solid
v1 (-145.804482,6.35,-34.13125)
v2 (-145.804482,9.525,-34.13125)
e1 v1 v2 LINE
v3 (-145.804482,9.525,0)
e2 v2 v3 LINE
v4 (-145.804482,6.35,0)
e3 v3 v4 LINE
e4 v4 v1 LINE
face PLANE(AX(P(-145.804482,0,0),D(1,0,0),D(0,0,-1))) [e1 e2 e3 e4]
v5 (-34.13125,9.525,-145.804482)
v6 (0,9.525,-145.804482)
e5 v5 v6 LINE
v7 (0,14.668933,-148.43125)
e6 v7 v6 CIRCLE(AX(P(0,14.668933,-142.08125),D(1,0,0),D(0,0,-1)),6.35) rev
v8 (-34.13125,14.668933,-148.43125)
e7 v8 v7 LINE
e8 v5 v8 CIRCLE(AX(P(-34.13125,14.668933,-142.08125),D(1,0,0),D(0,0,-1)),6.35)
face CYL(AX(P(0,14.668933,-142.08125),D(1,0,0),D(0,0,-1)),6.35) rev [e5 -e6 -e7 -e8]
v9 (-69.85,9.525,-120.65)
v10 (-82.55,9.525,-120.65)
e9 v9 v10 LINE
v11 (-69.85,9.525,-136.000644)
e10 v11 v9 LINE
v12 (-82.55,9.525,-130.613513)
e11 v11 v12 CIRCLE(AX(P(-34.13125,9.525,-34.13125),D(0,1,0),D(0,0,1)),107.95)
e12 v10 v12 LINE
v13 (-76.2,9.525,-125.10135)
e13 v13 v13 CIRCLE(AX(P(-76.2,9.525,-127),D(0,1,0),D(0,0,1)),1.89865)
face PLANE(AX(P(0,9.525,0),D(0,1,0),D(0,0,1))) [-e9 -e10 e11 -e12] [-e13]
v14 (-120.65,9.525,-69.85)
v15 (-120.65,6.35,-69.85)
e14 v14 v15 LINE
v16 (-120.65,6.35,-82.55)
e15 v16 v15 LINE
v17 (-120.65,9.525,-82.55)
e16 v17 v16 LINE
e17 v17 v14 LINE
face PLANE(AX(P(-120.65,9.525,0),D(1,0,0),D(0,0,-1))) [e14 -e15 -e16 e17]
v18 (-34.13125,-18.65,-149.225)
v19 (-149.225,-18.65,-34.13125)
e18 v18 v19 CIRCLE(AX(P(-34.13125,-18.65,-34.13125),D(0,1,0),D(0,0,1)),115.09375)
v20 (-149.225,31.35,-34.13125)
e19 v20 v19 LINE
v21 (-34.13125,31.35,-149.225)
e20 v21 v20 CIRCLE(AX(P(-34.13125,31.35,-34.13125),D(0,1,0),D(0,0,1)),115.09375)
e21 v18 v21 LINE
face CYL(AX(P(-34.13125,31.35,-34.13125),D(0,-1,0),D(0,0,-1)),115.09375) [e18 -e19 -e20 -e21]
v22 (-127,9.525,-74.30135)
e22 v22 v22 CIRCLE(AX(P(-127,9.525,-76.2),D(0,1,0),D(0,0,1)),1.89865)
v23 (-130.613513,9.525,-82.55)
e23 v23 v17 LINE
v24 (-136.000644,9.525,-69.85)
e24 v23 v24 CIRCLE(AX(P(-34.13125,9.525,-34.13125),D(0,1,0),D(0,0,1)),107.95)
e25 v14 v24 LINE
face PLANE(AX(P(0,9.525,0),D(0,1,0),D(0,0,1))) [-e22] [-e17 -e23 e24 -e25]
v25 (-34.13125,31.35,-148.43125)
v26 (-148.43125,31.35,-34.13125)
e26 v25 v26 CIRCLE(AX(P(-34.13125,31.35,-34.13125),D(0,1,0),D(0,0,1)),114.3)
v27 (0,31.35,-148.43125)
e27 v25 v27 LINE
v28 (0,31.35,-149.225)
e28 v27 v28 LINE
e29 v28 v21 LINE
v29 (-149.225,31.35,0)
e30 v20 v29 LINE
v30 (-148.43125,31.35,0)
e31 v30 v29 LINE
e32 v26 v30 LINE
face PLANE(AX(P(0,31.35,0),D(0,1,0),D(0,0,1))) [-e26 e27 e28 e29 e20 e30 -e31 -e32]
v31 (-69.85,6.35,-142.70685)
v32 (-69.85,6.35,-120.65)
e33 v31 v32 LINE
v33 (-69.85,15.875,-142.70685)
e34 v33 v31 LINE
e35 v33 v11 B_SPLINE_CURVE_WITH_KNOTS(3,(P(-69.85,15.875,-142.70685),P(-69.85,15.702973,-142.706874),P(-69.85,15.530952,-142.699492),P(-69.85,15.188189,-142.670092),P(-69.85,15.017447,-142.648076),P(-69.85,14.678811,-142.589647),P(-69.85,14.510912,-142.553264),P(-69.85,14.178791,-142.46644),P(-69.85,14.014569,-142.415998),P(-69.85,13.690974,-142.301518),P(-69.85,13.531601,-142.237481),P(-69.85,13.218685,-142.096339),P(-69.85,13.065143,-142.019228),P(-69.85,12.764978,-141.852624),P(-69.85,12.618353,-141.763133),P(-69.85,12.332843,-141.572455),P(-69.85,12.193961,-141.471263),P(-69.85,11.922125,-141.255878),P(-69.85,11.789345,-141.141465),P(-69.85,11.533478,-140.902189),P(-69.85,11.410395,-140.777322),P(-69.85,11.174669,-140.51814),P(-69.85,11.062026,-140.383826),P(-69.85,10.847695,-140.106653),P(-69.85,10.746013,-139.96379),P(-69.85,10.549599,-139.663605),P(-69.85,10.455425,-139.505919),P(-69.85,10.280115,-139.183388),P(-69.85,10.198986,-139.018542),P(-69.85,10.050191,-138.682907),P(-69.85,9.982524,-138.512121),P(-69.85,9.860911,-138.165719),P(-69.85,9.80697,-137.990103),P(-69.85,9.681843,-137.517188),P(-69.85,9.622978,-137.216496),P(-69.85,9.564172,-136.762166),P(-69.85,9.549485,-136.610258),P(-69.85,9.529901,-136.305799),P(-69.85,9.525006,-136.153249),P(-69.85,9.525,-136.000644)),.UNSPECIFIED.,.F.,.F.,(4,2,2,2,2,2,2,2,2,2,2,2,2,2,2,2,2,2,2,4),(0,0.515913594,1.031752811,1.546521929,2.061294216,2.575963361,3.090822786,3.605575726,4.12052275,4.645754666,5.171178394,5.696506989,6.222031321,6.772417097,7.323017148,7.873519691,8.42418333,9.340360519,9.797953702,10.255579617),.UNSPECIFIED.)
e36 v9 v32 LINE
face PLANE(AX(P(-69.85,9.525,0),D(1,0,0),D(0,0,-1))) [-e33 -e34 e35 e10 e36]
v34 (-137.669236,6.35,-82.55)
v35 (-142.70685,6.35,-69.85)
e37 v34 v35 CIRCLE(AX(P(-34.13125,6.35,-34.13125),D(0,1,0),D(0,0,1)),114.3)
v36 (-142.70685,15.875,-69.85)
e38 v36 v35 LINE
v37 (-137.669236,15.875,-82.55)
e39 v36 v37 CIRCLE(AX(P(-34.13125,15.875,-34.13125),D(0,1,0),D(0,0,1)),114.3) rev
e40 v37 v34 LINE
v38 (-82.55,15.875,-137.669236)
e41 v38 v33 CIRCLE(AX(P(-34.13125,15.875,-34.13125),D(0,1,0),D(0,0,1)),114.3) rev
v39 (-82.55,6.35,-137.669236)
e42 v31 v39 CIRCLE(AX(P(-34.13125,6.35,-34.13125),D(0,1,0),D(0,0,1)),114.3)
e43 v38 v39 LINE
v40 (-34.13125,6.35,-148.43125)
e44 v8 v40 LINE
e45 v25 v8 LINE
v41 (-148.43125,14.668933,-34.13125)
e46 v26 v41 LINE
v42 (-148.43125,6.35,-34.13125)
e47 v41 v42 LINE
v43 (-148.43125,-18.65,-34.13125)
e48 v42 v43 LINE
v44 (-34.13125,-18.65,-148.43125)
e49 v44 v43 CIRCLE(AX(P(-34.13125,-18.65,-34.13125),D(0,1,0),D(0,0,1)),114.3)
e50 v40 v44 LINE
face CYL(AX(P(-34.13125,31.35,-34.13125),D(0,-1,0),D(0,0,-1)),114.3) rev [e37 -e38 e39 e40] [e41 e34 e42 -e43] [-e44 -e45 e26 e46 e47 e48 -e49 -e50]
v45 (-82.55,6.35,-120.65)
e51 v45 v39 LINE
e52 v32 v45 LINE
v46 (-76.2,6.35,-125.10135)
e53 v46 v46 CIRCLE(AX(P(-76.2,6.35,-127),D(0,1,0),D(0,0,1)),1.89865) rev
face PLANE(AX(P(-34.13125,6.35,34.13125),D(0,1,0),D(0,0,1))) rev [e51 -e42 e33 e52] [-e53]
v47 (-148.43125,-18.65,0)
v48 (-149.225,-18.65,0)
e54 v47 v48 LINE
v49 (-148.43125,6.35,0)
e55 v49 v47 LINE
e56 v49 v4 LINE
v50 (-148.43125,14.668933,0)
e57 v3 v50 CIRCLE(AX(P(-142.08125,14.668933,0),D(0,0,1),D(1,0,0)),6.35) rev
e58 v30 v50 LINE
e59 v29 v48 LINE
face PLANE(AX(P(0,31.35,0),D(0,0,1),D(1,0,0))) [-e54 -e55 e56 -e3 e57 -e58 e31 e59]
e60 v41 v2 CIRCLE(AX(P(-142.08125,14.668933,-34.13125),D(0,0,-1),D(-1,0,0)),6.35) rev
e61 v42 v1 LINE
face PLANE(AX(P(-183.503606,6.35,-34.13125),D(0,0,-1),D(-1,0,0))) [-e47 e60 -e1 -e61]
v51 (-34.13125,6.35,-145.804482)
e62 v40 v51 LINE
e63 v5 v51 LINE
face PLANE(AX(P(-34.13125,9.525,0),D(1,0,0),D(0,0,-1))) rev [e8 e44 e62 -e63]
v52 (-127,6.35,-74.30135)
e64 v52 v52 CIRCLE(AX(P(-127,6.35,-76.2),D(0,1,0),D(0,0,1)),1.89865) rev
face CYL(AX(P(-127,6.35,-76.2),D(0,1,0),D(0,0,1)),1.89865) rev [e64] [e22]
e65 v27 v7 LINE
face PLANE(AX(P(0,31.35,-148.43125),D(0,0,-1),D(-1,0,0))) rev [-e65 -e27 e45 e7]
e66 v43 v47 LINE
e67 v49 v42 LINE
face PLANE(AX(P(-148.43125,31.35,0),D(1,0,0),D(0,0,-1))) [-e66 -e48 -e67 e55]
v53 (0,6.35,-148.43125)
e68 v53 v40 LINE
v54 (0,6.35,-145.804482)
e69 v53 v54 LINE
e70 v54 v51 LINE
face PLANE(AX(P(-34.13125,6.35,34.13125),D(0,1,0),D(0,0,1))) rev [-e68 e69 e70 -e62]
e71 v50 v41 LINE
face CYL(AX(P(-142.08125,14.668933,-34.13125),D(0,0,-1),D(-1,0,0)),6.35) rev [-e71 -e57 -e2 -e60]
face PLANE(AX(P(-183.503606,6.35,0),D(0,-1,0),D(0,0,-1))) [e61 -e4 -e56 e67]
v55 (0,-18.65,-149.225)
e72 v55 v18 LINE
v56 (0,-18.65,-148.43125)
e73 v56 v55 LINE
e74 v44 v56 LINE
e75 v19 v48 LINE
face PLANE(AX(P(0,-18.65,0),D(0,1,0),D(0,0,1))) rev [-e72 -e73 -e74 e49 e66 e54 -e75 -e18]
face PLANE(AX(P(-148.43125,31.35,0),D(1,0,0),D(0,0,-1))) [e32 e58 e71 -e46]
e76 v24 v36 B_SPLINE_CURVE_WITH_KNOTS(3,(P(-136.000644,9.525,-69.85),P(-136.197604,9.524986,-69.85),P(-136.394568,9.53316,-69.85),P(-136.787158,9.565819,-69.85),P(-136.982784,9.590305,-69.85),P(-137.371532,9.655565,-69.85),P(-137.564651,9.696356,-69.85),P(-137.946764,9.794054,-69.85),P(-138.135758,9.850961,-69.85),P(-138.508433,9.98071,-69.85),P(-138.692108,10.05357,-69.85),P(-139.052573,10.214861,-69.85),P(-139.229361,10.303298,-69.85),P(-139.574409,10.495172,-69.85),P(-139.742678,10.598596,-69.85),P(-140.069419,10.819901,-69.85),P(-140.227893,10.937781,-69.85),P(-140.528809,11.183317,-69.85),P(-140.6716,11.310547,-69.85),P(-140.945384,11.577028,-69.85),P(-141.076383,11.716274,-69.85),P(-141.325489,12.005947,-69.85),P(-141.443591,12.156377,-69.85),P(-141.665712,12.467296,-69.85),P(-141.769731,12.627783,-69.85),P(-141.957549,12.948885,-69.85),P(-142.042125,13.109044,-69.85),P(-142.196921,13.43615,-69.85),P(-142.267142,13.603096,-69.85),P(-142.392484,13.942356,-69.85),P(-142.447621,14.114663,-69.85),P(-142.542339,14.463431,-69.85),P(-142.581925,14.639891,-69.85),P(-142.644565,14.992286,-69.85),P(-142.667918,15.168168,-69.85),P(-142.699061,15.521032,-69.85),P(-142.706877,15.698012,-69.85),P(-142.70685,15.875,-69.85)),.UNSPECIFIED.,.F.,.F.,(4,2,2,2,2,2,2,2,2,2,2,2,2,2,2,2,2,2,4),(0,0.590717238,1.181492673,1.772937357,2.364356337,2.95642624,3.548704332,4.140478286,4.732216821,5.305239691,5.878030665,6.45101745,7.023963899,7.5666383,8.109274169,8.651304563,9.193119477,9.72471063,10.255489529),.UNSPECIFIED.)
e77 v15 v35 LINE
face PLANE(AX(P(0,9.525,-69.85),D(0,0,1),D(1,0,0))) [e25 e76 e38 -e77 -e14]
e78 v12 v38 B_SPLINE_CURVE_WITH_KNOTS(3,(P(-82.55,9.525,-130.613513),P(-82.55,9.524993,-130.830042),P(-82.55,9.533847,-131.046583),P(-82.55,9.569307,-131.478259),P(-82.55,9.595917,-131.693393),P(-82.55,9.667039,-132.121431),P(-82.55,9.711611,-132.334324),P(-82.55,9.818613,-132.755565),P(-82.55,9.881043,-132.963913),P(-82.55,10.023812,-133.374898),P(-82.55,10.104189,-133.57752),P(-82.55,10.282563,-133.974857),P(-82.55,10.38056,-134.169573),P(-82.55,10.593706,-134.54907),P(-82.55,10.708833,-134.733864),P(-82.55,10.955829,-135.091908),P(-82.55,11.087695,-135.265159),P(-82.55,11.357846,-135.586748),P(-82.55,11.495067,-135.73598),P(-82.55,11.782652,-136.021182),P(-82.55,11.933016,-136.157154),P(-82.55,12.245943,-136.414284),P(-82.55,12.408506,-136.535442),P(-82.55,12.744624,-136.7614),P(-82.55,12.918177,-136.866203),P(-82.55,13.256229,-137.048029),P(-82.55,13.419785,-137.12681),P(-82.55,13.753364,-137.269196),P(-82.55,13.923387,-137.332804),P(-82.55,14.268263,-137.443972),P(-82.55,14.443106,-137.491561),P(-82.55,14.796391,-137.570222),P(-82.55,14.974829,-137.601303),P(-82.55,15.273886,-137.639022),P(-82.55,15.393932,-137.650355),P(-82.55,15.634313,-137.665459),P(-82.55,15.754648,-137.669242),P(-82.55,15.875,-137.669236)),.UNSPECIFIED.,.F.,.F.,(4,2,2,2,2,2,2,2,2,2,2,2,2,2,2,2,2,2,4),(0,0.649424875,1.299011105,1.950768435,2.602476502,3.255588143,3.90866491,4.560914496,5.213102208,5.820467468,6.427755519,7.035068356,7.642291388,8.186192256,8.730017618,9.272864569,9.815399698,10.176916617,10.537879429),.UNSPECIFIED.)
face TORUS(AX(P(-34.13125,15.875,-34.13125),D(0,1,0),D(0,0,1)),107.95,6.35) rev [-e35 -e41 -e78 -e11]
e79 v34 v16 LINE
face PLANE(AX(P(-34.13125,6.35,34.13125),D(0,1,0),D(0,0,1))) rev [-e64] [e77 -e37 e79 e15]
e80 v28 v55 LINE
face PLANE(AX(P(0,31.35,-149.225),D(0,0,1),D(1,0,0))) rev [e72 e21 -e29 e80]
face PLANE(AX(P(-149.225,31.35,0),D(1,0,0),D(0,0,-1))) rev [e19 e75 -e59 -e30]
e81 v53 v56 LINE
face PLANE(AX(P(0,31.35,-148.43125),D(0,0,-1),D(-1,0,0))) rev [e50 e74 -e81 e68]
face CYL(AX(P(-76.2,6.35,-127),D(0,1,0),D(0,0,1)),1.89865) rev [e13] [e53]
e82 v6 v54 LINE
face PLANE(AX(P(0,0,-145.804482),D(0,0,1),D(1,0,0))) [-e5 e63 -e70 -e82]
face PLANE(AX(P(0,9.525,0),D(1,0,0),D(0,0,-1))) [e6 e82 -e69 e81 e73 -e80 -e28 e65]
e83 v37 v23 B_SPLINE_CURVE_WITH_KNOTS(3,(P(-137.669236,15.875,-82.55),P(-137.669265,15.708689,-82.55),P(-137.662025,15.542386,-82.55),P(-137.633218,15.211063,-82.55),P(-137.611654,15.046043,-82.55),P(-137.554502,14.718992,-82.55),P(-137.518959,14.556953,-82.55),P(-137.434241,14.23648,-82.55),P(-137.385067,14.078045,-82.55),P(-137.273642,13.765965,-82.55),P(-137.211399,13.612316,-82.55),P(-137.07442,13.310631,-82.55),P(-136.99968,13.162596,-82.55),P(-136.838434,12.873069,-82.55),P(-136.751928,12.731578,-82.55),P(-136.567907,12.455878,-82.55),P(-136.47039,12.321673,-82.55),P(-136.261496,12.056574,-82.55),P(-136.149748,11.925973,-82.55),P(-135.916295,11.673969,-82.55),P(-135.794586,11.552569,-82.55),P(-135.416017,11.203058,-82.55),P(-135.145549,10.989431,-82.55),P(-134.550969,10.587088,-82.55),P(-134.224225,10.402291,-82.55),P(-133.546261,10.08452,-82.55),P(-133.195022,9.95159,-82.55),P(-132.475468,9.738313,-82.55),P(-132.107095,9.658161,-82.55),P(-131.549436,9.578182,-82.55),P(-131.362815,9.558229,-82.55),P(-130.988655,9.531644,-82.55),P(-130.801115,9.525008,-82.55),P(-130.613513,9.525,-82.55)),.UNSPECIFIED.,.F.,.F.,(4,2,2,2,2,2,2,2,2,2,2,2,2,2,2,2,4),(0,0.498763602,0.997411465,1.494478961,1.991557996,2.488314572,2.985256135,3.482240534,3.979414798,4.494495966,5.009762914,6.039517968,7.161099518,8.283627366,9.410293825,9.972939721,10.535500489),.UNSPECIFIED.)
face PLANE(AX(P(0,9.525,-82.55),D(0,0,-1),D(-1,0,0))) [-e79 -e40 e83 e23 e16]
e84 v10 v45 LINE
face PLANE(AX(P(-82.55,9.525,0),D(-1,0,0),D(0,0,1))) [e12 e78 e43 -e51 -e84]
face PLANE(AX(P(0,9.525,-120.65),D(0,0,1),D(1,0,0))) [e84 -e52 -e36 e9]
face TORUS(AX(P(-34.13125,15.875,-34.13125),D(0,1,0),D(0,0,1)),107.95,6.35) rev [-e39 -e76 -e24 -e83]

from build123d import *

# Parameters (mm, degrees)
BOSS_EXTRUDE1_DEPTH      = 6.35
CUT_EXTRUDE1_DEPTH       = 6.35
M4_CLEARANCE_HOLE1_D     = 4.5
F_6_CLEARANCE_HOLE1_D    = 3.7973
F_6_CLEARANCE_HOLE2_D    = 3.7973
SKETCH29_R               = 1.898650000000008
BOSS_EXTRUDE4_DEPTH      = 3.175
CUT_EXTRUDE9_DEPTH       = 211.00951038732748
BOSS_EXTRUDE5_DEPTH      = 25
BOSS_EXTRUDE5_DEPTH_BACK = 25
BOSS_EXTRUDE6_DEPTH      = 3.420518063
SKETCH32_W               = 34.13124999999999
SKETCH32_H               = 3.175
BOSS_EXTRUDE7_DEPTH      = 3.420518063
FILLET2_R                = 6.35
FILLET3_R                = 6.35


with BuildPart() as part:
    # Sketch1 → Boss-Extrude1 (new body)
    with BuildSketch(Plane(origin=(0, 0, 0), x_dir=(1, 0, 0), z_dir=(0, 1, 0))):
        with BuildLine():
            Line((-34.13124999999996, -148.43124999999998), (34.131250000000016, -148.43124999999998))
            ThreePointArc((34.131250000000016, -148.43124999999998), (114.9535550896224, -114.95355508962234), (148.43124999999998, -34.13124999999996))
            Line((148.43124999999998, -34.13124999999996), (148.43124999999998, 34.131250000000016))
            ThreePointArc((148.43124999999998, 34.131250000000016), (114.9535550896224, 114.9535550896224), (34.131250000000016, 148.43125000000003))
            Line((34.131250000000016, 148.43125000000003), (-34.13124999999996, 148.43125000000003))
            ThreePointArc((-34.13124999999996, 148.43125000000003), (-114.95355508962231, 114.95355508962237), (-148.43124999999992, 34.131250000000016))
            Line((-148.43124999999992, 34.131250000000016), (-148.43124999999992, -34.13124999999996))
            ThreePointArc((-148.43124999999992, -34.13124999999996), (-114.95355508962234, -114.95355508962234), (-34.13124999999996, -148.43124999999998))
        make_face()
    extrude(amount=BOSS_EXTRUDE1_DEPTH)

    # Sketch4 → Cut-Extrude1 (cut)
    # profile 1 of 4: a face of its own
    with BuildSketch(Plane(origin=(0, 6.35, 0), x_dir=(1, 0, 0), z_dir=(0, 1, 0))):
        with BuildLine():
            ThreePointArc((-39.4480000000008, 145.80448193711538), (-49.893930566331434, 144.3300216659586), (-59.52363351317686, 140.0218527227403))
            ThreePointArc((-59.52363351317686, 140.0218527227403), (-63.81750000000949, 132.2535819370977), (-59.52363351317676, 124.48531115145514))
            ThreePointArc((-59.52363351317676, 124.48531115145514), (-49.89393056632884, 120.17714220824536), (-39.448000000000604, 118.70268193708908))
            Line((-39.448000000000604, 118.70268193708908), (39.44799999999939, 118.70268193708088))
            ThreePointArc((39.44799999999939, 118.70268193708088), (49.89393056633003, 120.17714220823765), (59.52363351317546, 124.48531115145597))
            ThreePointArc((59.52363351317546, 124.48531115145597), (63.817500000008096, 132.25358193709857), (59.523633513170694, 140.0218527227337))
            ThreePointArc((59.523633513170694, 140.0218527227337), (49.893930566325004, 144.3300216659425), (39.4479999999992, 145.80448193710717))
            Line((39.4479999999992, 145.80448193710717), (-39.4480000000008, 145.80448193711538))
        make_face()
        with BuildLine():
            ThreePointArc((39.447999999999375, 120.29018193708089), (49.454528647108134, 121.70261990502122), (58.67916380898574, 125.82956825808905))
            ThreePointArc((58.67916380898574, 125.82956825808905), (62.229999999999336, 132.25358193709857), (58.67916380898565, 138.67759561610805))
            ThreePointArc((58.67916380898565, 138.67759561610805), (49.45452864710313, 142.80454396915894), (39.447999999999205, 144.21698193711595))
            Line((39.447999999999205, 144.21698193711595), (-39.44800000000079, 144.21698193711538))
            ThreePointArc((-39.44800000000079, 144.21698193711538), (-49.454528647109534, 142.80454396917506), (-58.67916380898715, 138.67759561610723))
            ThreePointArc((-58.67916380898715, 138.67759561610723), (-62.23000000000073, 132.25358193709772), (-58.67916380898706, 125.82956825808822))
            ThreePointArc((-58.67916380898706, 125.82956825808822), (-49.454528647104546, 121.70261990503734), (-39.44800000000062, 120.29018193708033))
            Line((-39.44800000000062, 120.29018193708033), (39.447999999999375, 120.29018193708089))
        make_face(mode=Mode.SUBTRACT)
    # profile 2 of 4: a face of its own
    with BuildSketch(Plane(origin=(0, 6.35, 0), x_dir=(1, 0, 0), z_dir=(0, 1, 0))):
        with BuildLine():
            Line((-39.44800000000062, 120.29018193708033), (39.447999999999375, 120.29018193708089))
            ThreePointArc((39.447999999999375, 120.29018193708089), (49.454528647108134, 121.70261990502122), (58.67916380898574, 125.82956825808905))
            ThreePointArc((58.67916380898574, 125.82956825808905), (62.229999999999336, 132.25358193709857), (58.67916380898565, 138.67759561610805))
            ThreePointArc((58.67916380898565, 138.67759561610805), (49.45452864710313, 142.80454396915894), (39.447999999999205, 144.21698193711595))
            Line((39.447999999999205, 144.21698193711595), (-39.44800000000079, 144.21698193711538))
            ThreePointArc((-39.44800000000079, 144.21698193711538), (-49.454528647109534, 142.80454396917506), (-58.67916380898715, 138.67759561610723))
            ThreePointArc((-58.67916380898715, 138.67759561610723), (-62.23000000000073, 132.25358193709772), (-58.67916380898706, 125.82956825808822))
            ThreePointArc((-58.67916380898706, 125.82956825808822), (-49.454528647104546, 121.70261990503734), (-39.44800000000062, 120.29018193708033))
        make_face()
    # profile 3 of 4: a face of its own
    with BuildSketch(Plane(origin=(0, 6.35, 0), x_dir=(1, 0, 0), z_dir=(0, 1, 0))):
        with BuildLine():
            ThreePointArc((-59.5236335131764, -124.48531115145636), (-63.8175000000091, -132.25358193709894), (-59.52363351317174, -140.02185272273414))
            ThreePointArc((-59.52363351317174, -140.02185272273414), (-49.893930566326084, -144.33002166594298), (-39.44800000000029, -145.80448193711646))
            Line((-39.44800000000029, -145.80448193711646), (39.44799999999971, -145.80448193711646))
            ThreePointArc((39.44799999999971, -145.80448193711646), (49.89393056633035, -144.33002166595978), (59.52363351317579, -140.02185272274153))
            ThreePointArc((59.52363351317579, -140.02185272274153), (63.8175000000085, -132.25358193709894), (59.52363351317116, -124.48531115146376))
            ThreePointArc((59.52363351317116, -124.48531115146376), (49.89393056632551, -120.1771422082549), (39.44799999999971, -118.70268193709018))
            Line((39.44799999999971, -118.70268193709018), (-39.44800000000029, -118.70268193708142))
            ThreePointArc((-39.44800000000029, -118.70268193708142), (-49.89393056633094, -120.17714220823811), (-59.5236335131764, -124.48531115145636))
        make_face()
        with BuildLine():
            ThreePointArc((-58.679163808986694, -138.67759561610845), (-49.454528647104205, -142.8045439691594), (-39.44800000000029, -144.21698193711646))
            Line((-39.44800000000029, -144.21698193711646), (39.44799999999971, -144.21698193711646))
            ThreePointArc((39.44799999999971, -144.21698193711646), (49.45452864710846, -142.8045439691762), (58.679163808986104, -138.67759561610845))
            ThreePointArc((58.679163808986104, -138.67759561610845), (62.22999999999976, -132.25358193709894), (58.679163808986104, -125.82956825808944))
            ThreePointArc((58.679163808986104, -125.82956825808944), (49.45452864710362, -121.7026199050385), (39.44799999999971, -120.29018193708143))
            Line((39.44799999999971, -120.29018193708143), (-39.44800000000029, -120.29018193708143))
            ThreePointArc((-39.44800000000029, -120.29018193708143), (-49.45452864710904, -121.70261990502169), (-58.679163808986694, -125.82956825808944))
            ThreePointArc((-58.679163808986694, -125.82956825808944), (-62.230000000000345, -132.25358193709894), (-58.679163808986694, -138.67759561610845))
        make_face(mode=Mode.SUBTRACT)
    # profile 4 of 4: a face of its own
    with BuildSketch(Plane(origin=(0, 6.35, 0), x_dir=(1, 0, 0), z_dir=(0, 1, 0))):
        with BuildLine():
            ThreePointArc((-58.679163808986694, -125.82956825808944), (-62.230000000000345, -132.25358193709894), (-58.679163808986694, -138.67759561610845))
            ThreePointArc((-58.679163808986694, -138.67759561610845), (-49.454528647104205, -142.8045439691594), (-39.44800000000029, -144.21698193711646))
            Line((-39.44800000000029, -144.21698193711646), (39.44799999999971, -144.21698193711646))
            ThreePointArc((39.44799999999971, -144.21698193711646), (49.45452864710846, -142.8045439691762), (58.679163808986104, -138.67759561610845))
            ThreePointArc((58.679163808986104, -138.67759561610845), (62.22999999999976, -132.25358193709894), (58.679163808986104, -125.82956825808944))
            ThreePointArc((58.679163808986104, -125.82956825808944), (49.45452864710362, -121.7026199050385), (39.44799999999971, -120.29018193708143))
            Line((39.44799999999971, -120.29018193708143), (-39.44800000000029, -120.29018193708143))
            ThreePointArc((-39.44800000000029, -120.29018193708143), (-49.45452864710904, -121.70261990502169), (-58.679163808986694, -125.82956825808944))
        make_face()
    extrude(amount=-CUT_EXTRUDE1_DEPTH, mode=Mode.SUBTRACT)

    # M4 Clearance Hole1 (through all)
    with Locations(Plane(origin=(0, 6.35, 0), x_dir=(1, 0, 0), z_dir=(0, 1, 0))):
        with Locations((-16, -103.6875), (16, -103.6875), (22, -60.325), (-10, -60.325), (-10, 60.325), (22, 60.325), (16, 103.6875), (-16, 103.6875)):
            Hole(M4_CLEARANCE_HOLE1_D / 2)

    # #6 Clearance Hole1 (through all)
    with Locations(Plane(origin=(0, 6.35, 0), x_dir=(1, 0, 0), z_dir=(0, 1, 0))):
        with Locations((-101.6, -101.6), (-101.6, 101.6), (101.6, 101.6), (101.6, -101.6), (-127, -76.2), (-127, -50.8), (-127, 50.8), (-127, 76.2), (-101.6, 76.2), (-101.6, 50.8), (-101.6, 25.4), (-101.6, 0), (-101.6, -25.4), (-101.6, -50.8), (-101.6, -76.2), (-76.2, -101.6), (-50.8, -101.6), (-50.8, -76.2), (-76.2, -76.2), (-76.2, -50.8), (-50.8, -50.8), (-50.8, -25.4), (-76.2, -25.4), (-76.2, 0), (-50.8, 0), (-50.8, 25.4), (-76.2, 25.4), (-76.2, 50.8), (-50.8, 50.8), (-50.8, 76.2), (-76.2, 76.2), (-76.2, 101.6), (-50.8, 101.6), (50.8, -101.6), (76.2, -101.6), (101.6, -76.2), (127, -76.2), (127, -50.8), (101.6, -25.4), (101.6, -50.8), (76.2, -25.4), (76.2, -50.8), (76.2, -76.2), (50.8, -76.2), (50.8, -50.8), (50.8, -25.4), (50.8, 0), (76.2, 0), (101.6, 0), (101.6, 25.4), (101.6, 50.8), (101.6, 76.2), (127, 50.8), (127, 76.2), (76.2, 101.6), (50.8, 101.6), (50.8, 76.2), (76.2, 76.2), (76.2, 50.8), (76.2, 25.4), (50.8, 25.4), (50.8, 50.8), (0, 0), (-25.4, -25.4), (-25.4, 0), (-25.4, 25.4), (0, 25.4), (25.4, 25.4), (25.4, 0), (25.4, -25.4), (0, -25.4), (127, -25.4), (127, 0), (127, 25.4), (-127, -25.4), (-127, 0), (-127, 25.4)):
            Hole(F_6_CLEARANCE_HOLE1_D / 2)

    # #6 Clearance Hole2 (through all)
    with Locations(Plane(origin=(0, 6.35, 0), x_dir=(1, 0, 0), z_dir=(0, 1, 0))):
        with Locations((-76.2, -127), (76.2, -127), (76.2, 127), (-76.2, 127)):
            Hole(F_6_CLEARANCE_HOLE2_D / 2)

    # Sketch29 → Boss-Extrude4 (add)
    # profile 1 of 4: a face of its own
    with BuildSketch(Plane(origin=(0, 6.35, 0), x_dir=(1, 0, 0), z_dir=(0, 1, 0))):
        with BuildLine():
            Line((-69.85, 120.64999999999999), (-69.85, 142.70684992207043))
            ThreePointArc((-69.85, 142.70684992207043), (-76.27533753088031, 140.3779717667891), (-82.55, 137.66923649982286))
            Line((-82.55, 137.6692364998229), (-82.54999999999998, 120.64999999999999))
            Line((-82.54999999999998, 120.64999999999999), (-69.85, 120.64999999999999))
        make_face()
        with Locations(Location((-76.19999999999999, 127, 0), (0, 0, 270))):
            Circle(SKETCH29_R, mode=Mode.SUBTRACT)
    # profile 2 of 4: a face of its own
    with BuildSketch(Plane(origin=(0, 6.35, 0), x_dir=(1, 0, 0), z_dir=(0, 1, 0))):
        with BuildLine():
            Line((-120.6500000000006, 82.54999999999993), (-137.6692364998229, 82.54999999999993))
            ThreePointArc((-137.66923649982286, 82.5499999999999), (-140.37797176678907, 76.27533753088025), (-142.70684992207038, 69.84999999999994))
            Line((-142.70684992207043, 69.84999999999994), (-120.6500000000006, 69.84999999999994))
            Line((-120.6500000000006, 69.84999999999994), (-120.6500000000006, 82.54999999999993))
        make_face()
        with Locations(Location((-127.00000000000061, 76.19999999999993, 0), (0, 0, 270))):
            Circle(SKETCH29_R, mode=Mode.SUBTRACT)
    # profile 3 of 4: a face of its own
    with BuildSketch(Plane(origin=(0, 6.35, 0), x_dir=(1, 0, 0), z_dir=(0, 1, 0))):
        Polygon((-145.8044819371153, 34.13124999999998), (-145.8044819371153, 0), (-148.43124999999995, 2.082e-14), (-148.43124999999995, 34.131249999999994), align=None)
    # profile 4 of 4: a face of its own
    with BuildSketch(Plane(origin=(0, 6.35, 0), x_dir=(1, 0, 0), z_dir=(0, 1, 0))):
        Polygon((2.776e-14, 148.43125), (0, 145.80448193711538), (-34.13124999999999, 145.80448193711538), (-34.13124999999996, 148.43125000000003), align=None)
    extrude(amount=BOSS_EXTRUDE4_DEPTH)

    # Sketch30 → Cut-Extrude9 (cut, through all)
    with BuildSketch(Plane(origin=(0, 6.35, 0), x_dir=(1, 0, 0), z_dir=(0, 1, 0))):
        with BuildLine():
            Line((-34.13124999999998, -148.43124999999995), (34.131250000000016, -148.43124999999998))
            ThreePointArc((34.131250000000016, -148.43124999999998), (114.9535550896224, -114.95355508962234), (148.43125, -34.13124999999996))
            Line((148.43125, -34.13124999999996), (148.43124999999998, 34.131250000000016))
            ThreePointArc((148.43124999999998, 34.131250000000016), (114.95355508962237, 114.95355508962237), (34.13125000000002, 148.43125))
            Line((34.13125000000002, 148.43125), (-34.13124999999996, 148.43125000000003))
            ThreePointArc((-34.13124999999996, 148.43125000000003), (-114.95355508962234, 114.9535550896224), (-148.43124999999995, 34.13125000000003))
            Line((-148.43124999999995, 34.13125000000003), (-148.43124999999995, -34.131249999999945))
            ThreePointArc((-148.43124999999995, -34.131249999999945), (-114.95355508962234, -114.95355508962231), (-34.13124999999998, -148.43124999999995))
        make_face()
    extrude(amount=-CUT_EXTRUDE9_DEPTH, mode=Mode.SUBTRACT)


with BuildPart() as cut_extrude9_piece_1:
    # of the separate pieces the step leaves, piece 1, a body of its own (cut_extrude9_pieces)
    add(part.part.solids().sort_by_distance((-82.55, 6.35, -137.6692365))[0])



with BuildPart() as cut_extrude9_piece_2:
    # of the separate pieces the step leaves, piece 2, a body of its own (cut_extrude9_pieces)
    add(part.part.solids().sort_by_distance((-142.706849922, 6.35, -69.85))[0])


with BuildPart() as cut_extrude9_piece_3:
    # of the separate pieces the step leaves, piece 3, a body of its own (cut_extrude9_pieces)
    add(part.part.solids().sort_by_distance((-148.43125, 6.35, -34.13125))[0])


with BuildPart() as cut_extrude9_piece_4:
    # of the separate pieces the step leaves, piece 4, a body of its own (cut_extrude9_pieces)
    add(part.part.solids().sort_by_distance((-34.13125, 6.35, -145.804481937))[0])


with BuildPart() as cut_extrude9_piece_1_1:
    add(cut_extrude9_piece_1.part)

    add(cut_extrude9_piece_2.part)  # Boss-Extrude5 merges Cut-Extrude9 piece 2
    # Sketch29<7> → Boss-Extrude5 (add, two sides: drawn at the far end of the back side and taken through both)
    with BuildSketch(Plane(origin=(0, 6.35, 0), x_dir=(1, 0, 0), z_dir=(0, 1, 0)).offset(-BOSS_EXTRUDE5_DEPTH_BACK)):
        with BuildLine():
            ThreePointArc((-69.85, 142.70684992207043), (-52.21852354947877, 146.99107693388436), (-34.13124999999996, 148.43125000000003))
            Line((-34.13124999999996, 148.43125000000003), (2.842e-14, 148.43125))
            Line((2.776e-14, 148.43125), (2.776e-14, 149.22500000000002))
            Line((2.776e-14, 149.22500000000002), (-34.13124999999996, 149.22500000000002))
            ThreePointArc((-34.13124999999995, 149.22500000000002), (-115.51482109718914, 115.51482109718923), (-149.22499999999997, 34.13125000000003))
            Line((-149.22499999999997, 34.131249999999994), (-149.22499999999997, 2.132e-14))
            Line((-149.22499999999997, 2.082e-14), (-148.43124999999995, 2.082e-14))
            Line((-148.43124999999995, 2.132e-14), (-148.43124999999995, 34.131249999999994))
            ThreePointArc((-148.43124999999995, 34.13125000000001), (-146.9910769338843, 52.218523549478746), (-142.70684992207038, 69.84999999999994))
            ThreePointArc((-142.70684992207038, 69.84999999999994), (-140.37797176678907, 76.27533753088025), (-137.66923649982286, 82.5499999999999))
            ThreePointArc((-137.6692364998229, 82.54999999999994), (-114.9535550896224, 114.95355508962237), (-82.55000000000001, 137.66923649982292))
            ThreePointArc((-82.55, 137.66923649982286), (-76.27533753088031, 140.3779717667891), (-69.85, 142.70684992207043))
        make_face()
    extrude(amount=BOSS_EXTRUDE5_DEPTH + BOSS_EXTRUDE5_DEPTH_BACK)


    add(cut_extrude9_piece_3.part)  # Boss-Extrude6 merges Cut-Extrude9 piece 3
    # Sketch31 → Boss-Extrude6 (add)
    with BuildSketch(Plane(origin=(-145.8044819371153, 0, 0), x_dir=(0, 0, -1), z_dir=(1, 0, 0))):
        Polygon((1.15561e-12, 6.35), (34.13124999999998, 6.35), (34.13124999999998, 9.524999999999999), (1.15548e-12, 9.524999999999999), align=None)
    extrude(amount=-BOSS_EXTRUDE6_DEPTH)


    add(cut_extrude9_piece_4.part)  # Boss-Extrude7 merges Cut-Extrude9 piece 4
    # Sketch32 → Boss-Extrude7 (add)
    with BuildSketch(Plane.XY.offset(-145.80448193711126)):
        with Locations((-17.065625000015128, 7.937499999999998)):
            Rectangle(SKETCH32_W, SKETCH32_H)
    extrude(amount=-BOSS_EXTRUDE7_DEPTH)

    # Fillet2
    fillet2_edges = [cut_extrude9_piece_1_1.edges().sort_by_distance(p)[0] for p in [
        (-76.27533753088031, 9.524999999999999, -140.3779717667891),
        (-140.37797176678907, 9.524999999999999, -76.27533753088022),
    ]]
    fillet(fillet2_edges, radius=FILLET2_R)

    # Fillet3
    # the kernel refuses this fillet: 6.35 mm, written as the material it adds along each edge
    with BuildSketch(Plane(origin=(-34.13124999999996, 9.524999999999999, -148.43125000000003), x_dir=(0, 1, 0), z_dir=(1, 0, 8.3e-16))) as fillet3_piece_1:
        with BuildLine():
            CenterArc((5.143932731135228, 6.349999999999994), FILLET3_R, 215.89740993891724, 54.102590061082765)
            Line((0, 2.6267680628846506), (-0.10287865462270496, 2.5523034241423375))
            ThreePointArc((-0.10287865462270496, 2.5523034241423375), (-0.12700000000000067, 1.3133840314423253), (-0.12700000000000067, 0))
            Line((-0.12700000000000067, 0), (0, -0.12700000000000955))
            Line((0, -0.12700000000000955), (5.143932731135228, -0.12700000000000955))
            Line((5.143932731135228, -0.12700000000000955), (5.143932731135228, 0))
        make_face()
    extrude(amount=34.13124999999999)
    with BuildSketch(Plane(origin=(-148.43124999999995, 9.524999999999999, -2.082e-14), x_dir=(0, 1, 0), z_dir=(0, 0, -1))) as fillet3_piece_2:
        with BuildLine():
            CenterArc((5.143932731135228, 6.349999999999994), FILLET3_R, 215.89740993891724, 54.102590061082765)
            Line((0, 2.6267680628846506), (-0.10287865462270496, 2.5523034241423375))
            ThreePointArc((-0.10287865462270496, 2.5523034241423375), (-0.12700000000000067, 1.3133840314423253), (-0.12700000000000067, 0))
            Line((-0.12700000000000067, 0), (0, -0.12700000000000955))
            Line((0, -0.12700000000000955), (5.143932731135228, -0.12700000000000955))
            Line((5.143932731135228, -0.12700000000000955), (5.143932731135228, 0))
        make_face()
    extrude(amount=34.13124999999997)


solid = cut_extrude9_piece_1_1.part
